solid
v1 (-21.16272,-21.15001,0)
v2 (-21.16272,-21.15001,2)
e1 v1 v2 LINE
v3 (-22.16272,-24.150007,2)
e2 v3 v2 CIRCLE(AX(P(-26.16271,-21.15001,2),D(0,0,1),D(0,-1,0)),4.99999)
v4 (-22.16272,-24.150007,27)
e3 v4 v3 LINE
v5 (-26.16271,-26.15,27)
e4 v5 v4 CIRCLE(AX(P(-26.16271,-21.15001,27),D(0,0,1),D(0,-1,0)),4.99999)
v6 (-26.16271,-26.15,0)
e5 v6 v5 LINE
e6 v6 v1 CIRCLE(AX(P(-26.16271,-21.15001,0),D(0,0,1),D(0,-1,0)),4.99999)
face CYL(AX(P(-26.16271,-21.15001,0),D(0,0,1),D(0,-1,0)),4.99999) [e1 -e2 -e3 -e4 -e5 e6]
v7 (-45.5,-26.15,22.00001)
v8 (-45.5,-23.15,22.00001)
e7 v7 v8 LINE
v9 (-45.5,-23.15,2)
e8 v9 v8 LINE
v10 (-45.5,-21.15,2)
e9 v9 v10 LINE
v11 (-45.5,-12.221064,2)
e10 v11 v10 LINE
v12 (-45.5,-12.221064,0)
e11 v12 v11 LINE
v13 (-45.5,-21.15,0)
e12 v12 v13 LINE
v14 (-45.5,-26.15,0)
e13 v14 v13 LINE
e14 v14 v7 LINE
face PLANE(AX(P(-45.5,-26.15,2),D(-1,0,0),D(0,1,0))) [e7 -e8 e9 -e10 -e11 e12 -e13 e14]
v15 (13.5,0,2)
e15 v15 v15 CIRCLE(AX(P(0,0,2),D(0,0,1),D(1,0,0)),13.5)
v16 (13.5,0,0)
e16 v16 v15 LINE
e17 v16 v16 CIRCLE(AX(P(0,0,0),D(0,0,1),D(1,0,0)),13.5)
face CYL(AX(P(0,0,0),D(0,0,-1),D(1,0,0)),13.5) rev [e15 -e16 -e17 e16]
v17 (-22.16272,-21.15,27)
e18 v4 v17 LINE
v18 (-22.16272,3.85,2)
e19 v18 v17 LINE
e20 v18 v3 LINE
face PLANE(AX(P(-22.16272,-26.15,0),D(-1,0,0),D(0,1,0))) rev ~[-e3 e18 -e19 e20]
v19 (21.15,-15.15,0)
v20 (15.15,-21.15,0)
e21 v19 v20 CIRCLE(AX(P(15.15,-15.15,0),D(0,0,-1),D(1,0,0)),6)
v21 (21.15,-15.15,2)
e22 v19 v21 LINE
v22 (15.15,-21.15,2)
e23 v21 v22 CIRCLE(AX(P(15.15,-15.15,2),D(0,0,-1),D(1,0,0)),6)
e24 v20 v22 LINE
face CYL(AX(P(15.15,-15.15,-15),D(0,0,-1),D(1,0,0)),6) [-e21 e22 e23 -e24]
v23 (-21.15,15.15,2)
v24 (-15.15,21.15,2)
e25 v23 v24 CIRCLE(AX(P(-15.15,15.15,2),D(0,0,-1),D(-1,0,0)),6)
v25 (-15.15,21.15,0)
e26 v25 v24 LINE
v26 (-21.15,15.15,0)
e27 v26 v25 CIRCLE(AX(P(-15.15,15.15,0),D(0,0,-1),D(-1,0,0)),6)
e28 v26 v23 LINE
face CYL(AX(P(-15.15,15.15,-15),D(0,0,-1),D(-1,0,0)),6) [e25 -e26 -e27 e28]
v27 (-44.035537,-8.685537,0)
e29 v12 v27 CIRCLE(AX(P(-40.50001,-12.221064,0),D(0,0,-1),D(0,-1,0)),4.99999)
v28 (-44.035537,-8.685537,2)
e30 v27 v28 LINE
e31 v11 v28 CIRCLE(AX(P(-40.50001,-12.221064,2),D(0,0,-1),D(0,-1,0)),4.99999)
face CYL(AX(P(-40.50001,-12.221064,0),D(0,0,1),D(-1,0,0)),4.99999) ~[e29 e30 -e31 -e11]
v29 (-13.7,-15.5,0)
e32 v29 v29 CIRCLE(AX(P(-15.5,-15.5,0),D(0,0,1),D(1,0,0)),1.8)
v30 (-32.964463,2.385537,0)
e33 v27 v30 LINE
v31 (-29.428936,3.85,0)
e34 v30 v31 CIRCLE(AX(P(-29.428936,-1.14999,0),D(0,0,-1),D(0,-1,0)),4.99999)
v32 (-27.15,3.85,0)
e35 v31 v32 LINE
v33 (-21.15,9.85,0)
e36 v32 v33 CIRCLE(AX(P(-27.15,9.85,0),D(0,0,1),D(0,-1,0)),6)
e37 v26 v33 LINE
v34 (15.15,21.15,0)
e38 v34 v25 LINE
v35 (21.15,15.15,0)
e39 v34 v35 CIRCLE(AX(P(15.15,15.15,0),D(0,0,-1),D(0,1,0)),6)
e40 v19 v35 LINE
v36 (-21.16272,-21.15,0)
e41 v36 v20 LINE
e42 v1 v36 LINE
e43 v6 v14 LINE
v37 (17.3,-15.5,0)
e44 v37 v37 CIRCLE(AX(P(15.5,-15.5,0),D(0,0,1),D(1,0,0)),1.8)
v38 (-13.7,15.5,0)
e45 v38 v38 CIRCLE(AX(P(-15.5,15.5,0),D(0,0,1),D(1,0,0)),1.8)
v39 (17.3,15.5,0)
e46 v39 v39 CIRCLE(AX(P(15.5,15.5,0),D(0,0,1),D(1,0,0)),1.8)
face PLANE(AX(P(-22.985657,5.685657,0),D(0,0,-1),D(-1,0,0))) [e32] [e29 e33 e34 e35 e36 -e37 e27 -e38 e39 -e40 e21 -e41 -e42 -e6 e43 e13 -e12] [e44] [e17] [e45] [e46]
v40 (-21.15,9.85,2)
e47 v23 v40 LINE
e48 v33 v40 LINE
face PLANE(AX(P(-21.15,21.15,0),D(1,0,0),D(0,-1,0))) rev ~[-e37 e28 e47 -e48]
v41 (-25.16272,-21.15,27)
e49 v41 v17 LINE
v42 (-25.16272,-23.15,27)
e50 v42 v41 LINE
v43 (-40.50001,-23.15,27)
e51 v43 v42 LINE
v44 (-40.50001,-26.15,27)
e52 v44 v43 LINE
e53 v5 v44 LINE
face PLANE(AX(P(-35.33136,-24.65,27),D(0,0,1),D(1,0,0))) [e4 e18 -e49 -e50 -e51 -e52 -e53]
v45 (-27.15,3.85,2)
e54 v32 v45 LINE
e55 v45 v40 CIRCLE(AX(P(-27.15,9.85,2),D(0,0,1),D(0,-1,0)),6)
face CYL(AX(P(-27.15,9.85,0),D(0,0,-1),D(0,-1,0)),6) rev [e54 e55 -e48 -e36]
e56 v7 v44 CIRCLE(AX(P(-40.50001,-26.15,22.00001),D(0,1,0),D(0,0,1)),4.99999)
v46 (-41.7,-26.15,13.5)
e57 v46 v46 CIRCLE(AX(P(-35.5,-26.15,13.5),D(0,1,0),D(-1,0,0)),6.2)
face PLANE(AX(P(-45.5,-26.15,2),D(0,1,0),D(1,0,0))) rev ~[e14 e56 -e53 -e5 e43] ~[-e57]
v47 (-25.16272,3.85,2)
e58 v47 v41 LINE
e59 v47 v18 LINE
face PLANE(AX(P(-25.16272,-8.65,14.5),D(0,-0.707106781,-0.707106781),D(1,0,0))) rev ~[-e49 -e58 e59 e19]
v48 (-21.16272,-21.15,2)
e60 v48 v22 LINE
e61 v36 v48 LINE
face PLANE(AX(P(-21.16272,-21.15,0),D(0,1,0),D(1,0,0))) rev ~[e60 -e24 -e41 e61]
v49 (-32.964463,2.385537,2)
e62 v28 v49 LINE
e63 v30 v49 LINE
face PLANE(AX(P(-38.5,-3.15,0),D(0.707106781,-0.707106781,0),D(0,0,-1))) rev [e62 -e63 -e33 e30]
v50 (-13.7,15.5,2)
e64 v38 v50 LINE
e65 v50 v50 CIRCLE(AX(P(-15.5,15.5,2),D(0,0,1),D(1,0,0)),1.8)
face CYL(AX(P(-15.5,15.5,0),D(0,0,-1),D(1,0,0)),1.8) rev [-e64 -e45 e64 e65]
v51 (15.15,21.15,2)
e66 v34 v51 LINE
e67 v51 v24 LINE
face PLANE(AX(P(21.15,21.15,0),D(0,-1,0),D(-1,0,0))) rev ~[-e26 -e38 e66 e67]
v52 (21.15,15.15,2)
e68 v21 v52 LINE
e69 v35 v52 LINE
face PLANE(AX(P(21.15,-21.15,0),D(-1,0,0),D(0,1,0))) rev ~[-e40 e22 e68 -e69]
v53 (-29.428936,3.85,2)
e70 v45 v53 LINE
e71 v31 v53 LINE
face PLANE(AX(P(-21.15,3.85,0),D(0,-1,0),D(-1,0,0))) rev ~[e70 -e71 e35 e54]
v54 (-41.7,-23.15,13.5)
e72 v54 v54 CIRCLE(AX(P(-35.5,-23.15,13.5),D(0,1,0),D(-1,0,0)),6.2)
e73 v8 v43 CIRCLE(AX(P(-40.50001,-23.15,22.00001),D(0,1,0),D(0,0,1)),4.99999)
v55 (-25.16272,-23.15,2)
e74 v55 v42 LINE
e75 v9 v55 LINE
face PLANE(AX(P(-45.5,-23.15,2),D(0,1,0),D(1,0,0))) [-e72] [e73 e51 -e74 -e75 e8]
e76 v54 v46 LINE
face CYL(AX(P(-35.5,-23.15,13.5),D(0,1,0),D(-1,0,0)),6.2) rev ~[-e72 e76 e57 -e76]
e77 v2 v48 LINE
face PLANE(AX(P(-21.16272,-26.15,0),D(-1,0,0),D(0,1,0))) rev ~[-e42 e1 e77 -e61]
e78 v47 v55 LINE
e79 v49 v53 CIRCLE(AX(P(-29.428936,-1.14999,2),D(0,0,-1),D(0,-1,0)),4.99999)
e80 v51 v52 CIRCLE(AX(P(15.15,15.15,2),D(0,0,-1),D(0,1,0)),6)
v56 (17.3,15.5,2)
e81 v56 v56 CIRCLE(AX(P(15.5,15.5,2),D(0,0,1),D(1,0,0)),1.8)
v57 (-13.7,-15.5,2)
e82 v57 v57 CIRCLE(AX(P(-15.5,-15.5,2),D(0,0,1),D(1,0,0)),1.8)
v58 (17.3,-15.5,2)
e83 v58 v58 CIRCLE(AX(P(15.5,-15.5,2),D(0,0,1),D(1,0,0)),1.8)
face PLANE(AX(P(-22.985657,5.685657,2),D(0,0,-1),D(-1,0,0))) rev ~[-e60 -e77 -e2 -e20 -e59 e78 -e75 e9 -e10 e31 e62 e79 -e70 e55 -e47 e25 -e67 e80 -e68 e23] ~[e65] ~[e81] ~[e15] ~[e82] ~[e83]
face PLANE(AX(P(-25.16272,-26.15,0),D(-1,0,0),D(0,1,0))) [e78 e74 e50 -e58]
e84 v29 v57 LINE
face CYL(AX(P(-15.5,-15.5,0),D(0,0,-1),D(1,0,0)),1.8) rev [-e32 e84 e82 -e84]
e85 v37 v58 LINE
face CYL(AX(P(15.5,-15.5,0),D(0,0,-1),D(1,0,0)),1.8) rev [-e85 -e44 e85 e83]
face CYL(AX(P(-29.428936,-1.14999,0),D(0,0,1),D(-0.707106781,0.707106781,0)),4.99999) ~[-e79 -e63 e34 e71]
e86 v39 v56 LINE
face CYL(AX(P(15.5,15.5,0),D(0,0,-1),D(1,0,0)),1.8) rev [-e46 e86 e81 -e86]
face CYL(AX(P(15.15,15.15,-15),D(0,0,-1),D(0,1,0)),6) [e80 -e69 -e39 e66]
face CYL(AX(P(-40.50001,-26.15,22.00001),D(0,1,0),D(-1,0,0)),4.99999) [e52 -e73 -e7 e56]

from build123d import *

# Parameters (mm, degrees)
F0_R         = 1.8
F0_R_2       = 13.5
F0_W         = 24.3372796029
F0_H         = 5
F1_DEPTH     = 2
F2_W         = 3
F2_H         = 30
F3_DEPTH     = 27
F4_W         = 20.3372796029
F4_H         = 3
F5_DEPTH     = 25
F7_SIZE      = 25
F8_SIZE      = 14
F9_R         = 4.99999
F10_T1_DEPTH = 2
F10_T3_DEPTH = 32
F6_R         = 6.2
F11_DEPTH    = 25


# Not quite as in the source:
# - a fillet or chamfer that OpenCascade refuses, or shapes differently, is made with other operations: its cross-section is extruded or revolved along the edge and cut away or added
# - a fillet or chamfer is up to 0.001 mm smaller than in the source, because OpenCascade refuses the exact size


with BuildPart() as f1:
    # F0 (on Top) → F1 (new body)
    with BuildSketch(Plane.XY):
        Polygon((21.15, -21.15), (21.15, 21.15), (-21.15, 21.15), (-21.15, 3.85), (-21.15, -21.15), align=None)
        with Locations((-15.5, -15.5)):
            Circle(F0_R, mode=Mode.SUBTRACT)
        with Locations((15.5, -15.5)):
            Circle(F0_R, mode=Mode.SUBTRACT)
        with Locations((-15.5, 15.5)):
            Circle(F0_R, mode=Mode.SUBTRACT)
        Circle(F0_R_2, mode=Mode.SUBTRACT)
        with Locations((15.5, 15.5)):
            Circle(F0_R, mode=Mode.SUBTRACT)
        Polygon((-21.15, -21.15), (-21.15, 3.85), (-45.5, 3.85), (-45.5, -21.15), (-21.1627203971, -21.15), align=None)
        with Locations((-33.3313601986, -23.65)):
            Rectangle(F0_W, F0_H)
    extrude(amount=F1_DEPTH)

    # F2 (on Top) → F3 (join)
    with BuildSketch(Plane.XY):
        with Locations((-23.6627203971, -11.15)):
            Rectangle(F2_W, F2_H)
    extrude(amount=F3_DEPTH)

    # F4 (on face) → F5 (join)
    with BuildSketch(Plane.XY.offset(2)):
        with Locations((-35.3313601986, -24.65)):
            Rectangle(F4_W, F4_H)
    extrude(amount=F5_DEPTH)

    # F7
    f7_edges = [f1.edges().sort_by_distance(p)[0] for p in [
        (-23.66272, 3.85, 27),
    ]]
    chamfer(f7_edges, length=F7_SIZE)

    # F8
    f8_edges = [f1.edges().sort_by_distance(p)[0] for p in [
        (-45.5, 3.85, 1),
    ]]
    chamfer(f8_edges, length=F8_SIZE)

    # F9 (radius 5 in the source; OpenCascade refuses exactly that, so slightly less here)
    f9_edges = [f1.edges().sort_by_distance(p)[0] for p in [
        (-45.5, -10.15, 1),
        (-31.5, 3.85, 1),
        (-21.16272, -26.15, 1),
        (-45.5, -24.65, 27),
    ]]
    fillet(f9_edges, radius=F9_R)

    # F10: fillet of radius 6 on 4 edges, made by hand

    # F10_s2 → F10_t1 (join)
    with BuildSketch(Plane.XY):
        with BuildLine():
            ThreePointArc((-27.15, 3.85), (-22.9073593129, 5.6073593129), (-21.15, 9.85))
            Line((-21.15, 9.85), (-21.15, 3.85))
            Line((-21.15, 3.85), (-27.15, 3.85))
        make_face()
    extrude(amount=F10_T1_DEPTH)

    # F10_s4 → F10_t3 (cut)
    with BuildSketch(Plane.XY.offset(-15)):
        with BuildLine():
            ThreePointArc((21.15, -15.15), (19.3926406871, -19.3926406871), (15.15, -21.15))
            Line((15.15, -21.15), (21.15, -21.15))
            Line((21.15, -21.15), (21.15, -15.15))
        make_face()
        with BuildLine():
            ThreePointArc((15.15, 21.15), (19.3926406871, 19.3926406871), (21.15, 15.15))
            Line((21.15, 15.15), (21.15, 21.15))
            Line((21.15, 21.15), (15.15, 21.15))
        make_face()
        with BuildLine():
            ThreePointArc((-21.15, 15.15), (-19.3926406871, 19.3926406871), (-15.15, 21.15))
            Line((-15.15, 21.15), (-21.15, 21.15))
            Line((-21.15, 21.15), (-21.15, 15.15))
        make_face()
    extrude(amount=F10_T3_DEPTH, mode=Mode.SUBTRACT)

    # F6 (on face) + F5_face1 (on face) → F11 (cut)
    with BuildSketch(Plane(origin=(0, -23.15, 0), x_dir=(-1, 0, 0), z_dir=(0, 1, 0))):
        with Locations((35.5, 13.5)):
            Circle(F6_R)
    with BuildSketch(Plane(origin=(-35.7425668405, -26.15, 13.3714329468), x_dir=(1, 0, 0), z_dir=(0, -1, 0))):
        with BuildLine():
            Line((-9.7574331595, -13.3714329468), (9.5798564434, -13.3714329468))
            Line((9.5798564434, -13.3714329468), (9.5798564434, 13.6285670532))
            Line((9.5798564434, 13.6285670532), (-4.7574431595, 13.6285670532))
            ThreePointArc((-4.7574431595, 13.6285670532), (-8.2929699944, 12.1641038881), (-9.7574331595, 8.6285770532))
            Line((-9.7574331595, 8.6285770532), (-9.7574331595, -13.3714329468))
        make_face()
    extrude(amount=-F11_DEPTH, dir=(0, 1, 0), mode=Mode.SUBTRACT)


solid = f1.part
